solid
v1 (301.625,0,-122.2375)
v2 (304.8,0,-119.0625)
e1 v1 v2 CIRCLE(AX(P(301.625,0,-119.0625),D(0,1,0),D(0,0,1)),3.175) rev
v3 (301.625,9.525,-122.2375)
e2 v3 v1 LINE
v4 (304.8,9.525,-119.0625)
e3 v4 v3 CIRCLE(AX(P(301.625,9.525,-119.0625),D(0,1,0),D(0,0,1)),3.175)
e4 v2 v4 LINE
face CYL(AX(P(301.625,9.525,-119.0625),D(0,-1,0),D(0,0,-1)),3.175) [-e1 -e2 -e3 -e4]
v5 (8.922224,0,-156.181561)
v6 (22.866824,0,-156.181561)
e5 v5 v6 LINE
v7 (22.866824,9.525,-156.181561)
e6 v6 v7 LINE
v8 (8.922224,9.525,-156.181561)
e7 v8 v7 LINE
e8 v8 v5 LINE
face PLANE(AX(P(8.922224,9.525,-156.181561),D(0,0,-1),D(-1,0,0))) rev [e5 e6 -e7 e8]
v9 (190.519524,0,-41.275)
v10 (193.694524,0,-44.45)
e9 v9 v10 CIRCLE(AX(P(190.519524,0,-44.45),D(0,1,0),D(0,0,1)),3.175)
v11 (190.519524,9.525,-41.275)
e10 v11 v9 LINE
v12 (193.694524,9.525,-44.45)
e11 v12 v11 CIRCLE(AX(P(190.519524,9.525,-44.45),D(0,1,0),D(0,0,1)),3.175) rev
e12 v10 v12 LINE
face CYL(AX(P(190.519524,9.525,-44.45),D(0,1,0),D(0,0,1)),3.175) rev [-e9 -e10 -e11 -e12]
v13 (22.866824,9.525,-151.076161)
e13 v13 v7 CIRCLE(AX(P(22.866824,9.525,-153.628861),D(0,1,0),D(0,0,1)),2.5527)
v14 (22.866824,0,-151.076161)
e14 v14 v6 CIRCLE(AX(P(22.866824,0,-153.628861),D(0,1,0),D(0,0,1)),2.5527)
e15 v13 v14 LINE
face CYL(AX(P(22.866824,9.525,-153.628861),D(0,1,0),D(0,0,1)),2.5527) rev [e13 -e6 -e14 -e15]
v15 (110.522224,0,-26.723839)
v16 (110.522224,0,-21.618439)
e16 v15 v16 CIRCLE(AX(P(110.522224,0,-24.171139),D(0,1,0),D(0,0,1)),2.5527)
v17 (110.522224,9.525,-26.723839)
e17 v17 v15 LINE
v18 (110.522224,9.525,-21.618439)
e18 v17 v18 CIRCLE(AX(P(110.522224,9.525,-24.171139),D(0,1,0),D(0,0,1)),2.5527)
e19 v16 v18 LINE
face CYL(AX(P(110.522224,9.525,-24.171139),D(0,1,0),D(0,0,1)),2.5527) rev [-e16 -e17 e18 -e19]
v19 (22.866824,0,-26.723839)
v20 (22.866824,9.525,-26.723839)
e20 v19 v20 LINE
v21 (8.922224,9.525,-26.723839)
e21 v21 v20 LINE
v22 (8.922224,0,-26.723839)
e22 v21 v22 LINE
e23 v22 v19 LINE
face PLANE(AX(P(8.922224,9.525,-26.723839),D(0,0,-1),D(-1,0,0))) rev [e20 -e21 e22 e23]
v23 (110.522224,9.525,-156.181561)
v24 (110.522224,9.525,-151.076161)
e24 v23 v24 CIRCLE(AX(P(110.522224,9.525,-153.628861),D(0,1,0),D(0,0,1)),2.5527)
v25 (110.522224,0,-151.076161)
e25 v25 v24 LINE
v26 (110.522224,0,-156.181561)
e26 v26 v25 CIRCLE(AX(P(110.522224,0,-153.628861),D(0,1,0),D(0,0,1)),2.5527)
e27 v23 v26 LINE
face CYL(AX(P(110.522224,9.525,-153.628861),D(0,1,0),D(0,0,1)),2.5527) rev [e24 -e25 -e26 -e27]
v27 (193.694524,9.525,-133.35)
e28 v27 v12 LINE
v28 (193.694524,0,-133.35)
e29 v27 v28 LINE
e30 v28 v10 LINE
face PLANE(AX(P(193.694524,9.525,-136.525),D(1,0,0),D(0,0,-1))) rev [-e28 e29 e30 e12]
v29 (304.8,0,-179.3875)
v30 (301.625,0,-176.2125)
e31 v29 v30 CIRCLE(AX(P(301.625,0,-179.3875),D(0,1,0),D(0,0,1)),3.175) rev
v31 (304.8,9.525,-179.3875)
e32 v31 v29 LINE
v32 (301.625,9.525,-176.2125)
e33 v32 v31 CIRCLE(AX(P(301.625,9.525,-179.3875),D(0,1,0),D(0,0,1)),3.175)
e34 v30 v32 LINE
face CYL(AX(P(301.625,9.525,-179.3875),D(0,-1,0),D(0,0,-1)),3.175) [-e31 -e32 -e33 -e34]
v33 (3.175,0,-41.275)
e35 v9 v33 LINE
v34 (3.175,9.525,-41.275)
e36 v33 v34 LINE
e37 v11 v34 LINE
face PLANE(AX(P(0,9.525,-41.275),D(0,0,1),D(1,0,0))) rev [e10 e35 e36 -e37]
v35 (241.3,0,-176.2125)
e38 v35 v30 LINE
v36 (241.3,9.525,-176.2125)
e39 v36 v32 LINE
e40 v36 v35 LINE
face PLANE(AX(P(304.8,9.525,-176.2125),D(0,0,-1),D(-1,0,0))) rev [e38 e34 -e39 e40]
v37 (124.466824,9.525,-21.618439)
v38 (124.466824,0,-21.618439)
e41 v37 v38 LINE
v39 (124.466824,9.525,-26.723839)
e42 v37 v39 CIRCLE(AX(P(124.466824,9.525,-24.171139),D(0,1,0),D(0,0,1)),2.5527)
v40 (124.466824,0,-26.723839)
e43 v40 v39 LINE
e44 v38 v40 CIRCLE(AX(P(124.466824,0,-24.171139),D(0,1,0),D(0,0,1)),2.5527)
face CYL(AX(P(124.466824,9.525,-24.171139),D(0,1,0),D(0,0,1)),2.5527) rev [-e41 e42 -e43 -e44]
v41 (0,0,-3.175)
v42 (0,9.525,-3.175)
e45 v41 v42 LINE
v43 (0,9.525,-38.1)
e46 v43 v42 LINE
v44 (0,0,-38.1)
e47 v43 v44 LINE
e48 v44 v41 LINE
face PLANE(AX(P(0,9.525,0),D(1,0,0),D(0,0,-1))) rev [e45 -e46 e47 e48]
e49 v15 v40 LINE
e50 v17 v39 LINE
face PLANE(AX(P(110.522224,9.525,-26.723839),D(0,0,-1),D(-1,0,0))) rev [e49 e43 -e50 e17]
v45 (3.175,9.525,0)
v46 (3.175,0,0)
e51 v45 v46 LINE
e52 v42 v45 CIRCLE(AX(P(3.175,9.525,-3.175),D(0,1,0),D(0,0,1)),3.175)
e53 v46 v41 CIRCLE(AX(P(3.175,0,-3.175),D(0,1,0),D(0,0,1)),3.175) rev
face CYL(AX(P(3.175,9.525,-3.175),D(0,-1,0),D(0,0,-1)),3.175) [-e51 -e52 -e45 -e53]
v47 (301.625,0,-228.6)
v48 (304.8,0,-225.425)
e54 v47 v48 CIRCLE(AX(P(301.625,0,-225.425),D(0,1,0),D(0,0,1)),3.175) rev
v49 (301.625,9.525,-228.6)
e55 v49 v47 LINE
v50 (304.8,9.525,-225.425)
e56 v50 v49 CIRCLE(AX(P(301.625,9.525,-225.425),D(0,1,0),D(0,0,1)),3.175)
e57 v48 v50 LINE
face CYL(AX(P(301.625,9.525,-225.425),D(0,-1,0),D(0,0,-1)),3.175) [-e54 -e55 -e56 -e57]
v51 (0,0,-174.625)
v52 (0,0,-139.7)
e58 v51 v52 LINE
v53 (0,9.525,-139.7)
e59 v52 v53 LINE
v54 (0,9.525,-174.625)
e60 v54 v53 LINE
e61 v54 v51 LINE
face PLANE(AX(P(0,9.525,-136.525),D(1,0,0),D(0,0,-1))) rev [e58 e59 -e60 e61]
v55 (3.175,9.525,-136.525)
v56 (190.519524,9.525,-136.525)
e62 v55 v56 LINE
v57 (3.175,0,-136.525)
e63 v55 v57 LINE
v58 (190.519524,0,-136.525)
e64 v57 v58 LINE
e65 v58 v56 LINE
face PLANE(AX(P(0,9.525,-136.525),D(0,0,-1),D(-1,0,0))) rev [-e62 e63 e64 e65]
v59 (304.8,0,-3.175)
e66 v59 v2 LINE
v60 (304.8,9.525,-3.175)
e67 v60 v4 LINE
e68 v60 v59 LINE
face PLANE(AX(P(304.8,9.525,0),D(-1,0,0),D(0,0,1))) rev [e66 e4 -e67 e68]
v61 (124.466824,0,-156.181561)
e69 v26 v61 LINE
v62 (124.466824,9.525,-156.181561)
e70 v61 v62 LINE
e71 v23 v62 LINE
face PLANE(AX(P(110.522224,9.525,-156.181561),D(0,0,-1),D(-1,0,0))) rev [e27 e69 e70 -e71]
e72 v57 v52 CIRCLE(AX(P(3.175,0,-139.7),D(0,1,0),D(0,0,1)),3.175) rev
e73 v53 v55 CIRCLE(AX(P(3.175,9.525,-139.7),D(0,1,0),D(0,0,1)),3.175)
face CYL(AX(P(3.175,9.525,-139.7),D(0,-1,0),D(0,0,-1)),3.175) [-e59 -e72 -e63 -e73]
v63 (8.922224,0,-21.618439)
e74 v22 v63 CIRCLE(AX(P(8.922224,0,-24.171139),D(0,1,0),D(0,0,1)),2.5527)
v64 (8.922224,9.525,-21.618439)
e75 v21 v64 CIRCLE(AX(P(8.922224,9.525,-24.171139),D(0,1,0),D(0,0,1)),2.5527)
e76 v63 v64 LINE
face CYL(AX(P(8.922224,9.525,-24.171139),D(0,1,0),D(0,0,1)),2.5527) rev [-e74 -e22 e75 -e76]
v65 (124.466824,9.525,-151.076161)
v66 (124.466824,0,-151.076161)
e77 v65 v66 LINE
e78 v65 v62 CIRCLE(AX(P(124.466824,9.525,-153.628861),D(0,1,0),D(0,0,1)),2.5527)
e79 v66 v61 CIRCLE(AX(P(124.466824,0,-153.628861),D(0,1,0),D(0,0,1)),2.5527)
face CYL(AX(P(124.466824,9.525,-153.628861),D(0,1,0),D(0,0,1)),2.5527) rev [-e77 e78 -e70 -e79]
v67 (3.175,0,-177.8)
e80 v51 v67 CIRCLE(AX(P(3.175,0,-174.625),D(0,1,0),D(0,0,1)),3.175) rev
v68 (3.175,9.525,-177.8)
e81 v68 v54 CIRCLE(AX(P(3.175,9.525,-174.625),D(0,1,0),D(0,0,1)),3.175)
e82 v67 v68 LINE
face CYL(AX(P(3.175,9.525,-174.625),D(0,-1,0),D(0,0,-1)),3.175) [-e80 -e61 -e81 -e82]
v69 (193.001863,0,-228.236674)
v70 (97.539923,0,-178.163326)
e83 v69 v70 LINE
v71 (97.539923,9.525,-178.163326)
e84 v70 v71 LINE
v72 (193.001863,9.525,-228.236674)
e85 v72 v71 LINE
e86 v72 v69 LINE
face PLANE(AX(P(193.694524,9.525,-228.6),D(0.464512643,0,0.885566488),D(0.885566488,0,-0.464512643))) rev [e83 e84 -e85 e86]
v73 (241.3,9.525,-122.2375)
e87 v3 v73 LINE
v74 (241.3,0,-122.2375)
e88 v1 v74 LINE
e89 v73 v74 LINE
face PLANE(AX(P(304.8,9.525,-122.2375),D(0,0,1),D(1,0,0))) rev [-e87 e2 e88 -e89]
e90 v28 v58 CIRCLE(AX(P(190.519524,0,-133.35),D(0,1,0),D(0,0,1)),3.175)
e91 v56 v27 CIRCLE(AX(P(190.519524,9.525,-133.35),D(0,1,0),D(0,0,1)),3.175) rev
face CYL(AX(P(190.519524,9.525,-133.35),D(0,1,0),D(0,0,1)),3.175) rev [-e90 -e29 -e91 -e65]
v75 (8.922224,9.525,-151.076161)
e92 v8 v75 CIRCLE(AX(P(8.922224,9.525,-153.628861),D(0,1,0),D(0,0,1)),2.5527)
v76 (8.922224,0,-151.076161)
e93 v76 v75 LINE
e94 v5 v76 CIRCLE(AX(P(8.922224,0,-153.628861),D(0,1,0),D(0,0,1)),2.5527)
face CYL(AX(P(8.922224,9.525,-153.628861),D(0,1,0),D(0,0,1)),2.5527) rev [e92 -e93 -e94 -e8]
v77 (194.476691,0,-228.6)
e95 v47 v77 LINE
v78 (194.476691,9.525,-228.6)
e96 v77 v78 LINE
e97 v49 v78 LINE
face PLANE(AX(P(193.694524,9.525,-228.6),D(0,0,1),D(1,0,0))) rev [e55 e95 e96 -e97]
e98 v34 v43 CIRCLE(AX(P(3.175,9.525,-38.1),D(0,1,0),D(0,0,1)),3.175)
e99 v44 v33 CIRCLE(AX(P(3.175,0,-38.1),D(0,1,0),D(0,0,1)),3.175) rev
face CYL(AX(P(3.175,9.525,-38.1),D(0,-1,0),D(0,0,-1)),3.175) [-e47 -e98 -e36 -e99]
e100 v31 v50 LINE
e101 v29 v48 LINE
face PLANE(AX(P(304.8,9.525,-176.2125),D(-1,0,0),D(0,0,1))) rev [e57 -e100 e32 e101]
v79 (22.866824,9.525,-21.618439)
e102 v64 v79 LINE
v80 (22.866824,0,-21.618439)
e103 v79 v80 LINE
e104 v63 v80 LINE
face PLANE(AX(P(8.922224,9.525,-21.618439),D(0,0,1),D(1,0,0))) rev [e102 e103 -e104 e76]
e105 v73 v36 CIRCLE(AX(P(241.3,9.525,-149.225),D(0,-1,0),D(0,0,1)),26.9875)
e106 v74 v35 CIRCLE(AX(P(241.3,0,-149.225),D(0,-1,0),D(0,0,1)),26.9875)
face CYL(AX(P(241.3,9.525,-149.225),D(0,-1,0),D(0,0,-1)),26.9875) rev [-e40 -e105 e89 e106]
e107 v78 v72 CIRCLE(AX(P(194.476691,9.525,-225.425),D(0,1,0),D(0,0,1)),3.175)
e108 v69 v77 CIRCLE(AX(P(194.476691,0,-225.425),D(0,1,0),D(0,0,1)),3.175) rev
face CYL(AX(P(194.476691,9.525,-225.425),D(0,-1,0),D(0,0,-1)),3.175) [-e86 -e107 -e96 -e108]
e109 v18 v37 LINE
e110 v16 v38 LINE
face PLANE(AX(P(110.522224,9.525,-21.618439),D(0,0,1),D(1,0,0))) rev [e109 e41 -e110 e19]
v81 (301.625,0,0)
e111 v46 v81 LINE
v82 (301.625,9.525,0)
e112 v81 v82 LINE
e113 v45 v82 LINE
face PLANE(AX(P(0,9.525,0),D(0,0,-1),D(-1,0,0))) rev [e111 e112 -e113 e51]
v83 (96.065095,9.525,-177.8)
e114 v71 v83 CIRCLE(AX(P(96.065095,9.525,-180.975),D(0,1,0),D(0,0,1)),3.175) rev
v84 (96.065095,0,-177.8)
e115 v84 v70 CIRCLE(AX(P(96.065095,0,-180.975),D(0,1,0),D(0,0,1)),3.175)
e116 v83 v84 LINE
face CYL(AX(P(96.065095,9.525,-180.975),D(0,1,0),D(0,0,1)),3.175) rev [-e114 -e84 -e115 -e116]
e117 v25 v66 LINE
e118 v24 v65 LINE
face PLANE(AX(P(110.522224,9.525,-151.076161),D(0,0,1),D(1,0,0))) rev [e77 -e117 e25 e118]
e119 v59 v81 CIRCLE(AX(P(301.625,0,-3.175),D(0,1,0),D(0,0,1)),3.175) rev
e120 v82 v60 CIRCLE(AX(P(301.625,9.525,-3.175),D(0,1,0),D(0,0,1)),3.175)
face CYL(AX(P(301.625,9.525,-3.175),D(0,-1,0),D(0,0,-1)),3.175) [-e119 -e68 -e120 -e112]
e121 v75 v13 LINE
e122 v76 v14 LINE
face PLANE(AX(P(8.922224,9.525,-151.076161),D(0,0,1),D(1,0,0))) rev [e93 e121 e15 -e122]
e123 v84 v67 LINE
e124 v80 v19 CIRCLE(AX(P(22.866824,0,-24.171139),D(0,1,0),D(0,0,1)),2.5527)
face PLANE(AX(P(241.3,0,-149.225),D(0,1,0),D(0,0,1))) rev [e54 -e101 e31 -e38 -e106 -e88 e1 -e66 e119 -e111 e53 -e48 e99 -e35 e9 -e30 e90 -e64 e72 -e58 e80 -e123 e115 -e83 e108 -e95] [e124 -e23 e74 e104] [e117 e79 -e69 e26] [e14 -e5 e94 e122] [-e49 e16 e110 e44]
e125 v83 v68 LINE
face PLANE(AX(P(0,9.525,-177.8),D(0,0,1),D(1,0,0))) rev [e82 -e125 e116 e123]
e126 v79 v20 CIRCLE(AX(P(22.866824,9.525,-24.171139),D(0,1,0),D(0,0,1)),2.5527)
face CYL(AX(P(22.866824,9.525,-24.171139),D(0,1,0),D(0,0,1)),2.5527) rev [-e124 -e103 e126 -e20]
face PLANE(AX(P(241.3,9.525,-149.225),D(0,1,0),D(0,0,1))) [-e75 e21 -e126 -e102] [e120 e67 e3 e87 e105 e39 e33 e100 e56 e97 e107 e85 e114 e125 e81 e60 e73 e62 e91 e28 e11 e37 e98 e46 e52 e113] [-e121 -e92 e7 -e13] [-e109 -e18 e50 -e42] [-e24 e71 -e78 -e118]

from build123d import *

# Parameters (mm, degrees)
BOSS_EXTRUDE1_DEPTH            = 9.525
F_7_0_201_DIAMETER_SLOT1_DEPTH = 9.525
FILLET1_R                      = 3.175


# Read off the part's stored shape, not the designer's step: #7 (0.201) Diameter Slot1
with BuildPart() as part:
    # Sketch1 → Boss-Extrude1 (new body)
    with BuildSketch(Plane(origin=(0, 0, 0), x_dir=(1, 0, 0), z_dir=(0, 1, 0))):
        with BuildLine():
            Line((0, 0), (304.8, 0))
            Line((304.8, 0), (304.8, 122.2375))
            Line((304.8, 122.2375), (241.3, 122.2375))
            ThreePointArc((241.3, 122.2375), (214.3125, 149.225), (241.3, 176.2125))
            Line((241.3, 176.2125), (304.8, 176.2125))
            Line((304.8, 176.2125), (304.8, 228.6))
            Line((304.8, 228.6), (193.694523922, 228.6))
            Line((193.694523922, 228.6), (96.847261961, 177.8))
            Line((96.847261961, 177.8), (0, 177.8))
            Line((0, 177.8), (0, 136.525))
            Line((0, 136.525), (193.694523922, 136.525))
            Line((193.694523922, 136.525), (193.694523922, 41.275))
            Line((193.694523922, 41.275), (0, 41.275))
            Line((0, 41.275), (0, 0))
        make_face()
    extrude(amount=BOSS_EXTRUDE1_DEPTH)

    # #7 (0.201) Diameter Slot1 outline → #7 (0.201) Diameter Slot1 (cut)
    with BuildSketch(Plane(origin=(0, 0, 0), x_dir=(1, 0, 0), z_dir=(0, 1, 0))):
        with BuildLine():
            Line((8.922223922, 151.076161), (22.866823922, 151.076161))
            ThreePointArc((22.866823922, 151.076161), (25.419523922, 153.628861), (22.866823922, 156.181561))
            Line((22.866823922, 156.181561), (8.922223922, 156.181561))
            ThreePointArc((8.922223922, 156.181561), (6.369523922, 153.628861), (8.922223922, 151.076161))
        make_face()
        with BuildLine():
            ThreePointArc((124.466823922, 151.076161), (127.019523922, 153.628861), (124.466823922, 156.181561))
            Line((124.466823922, 156.181561), (110.522223922, 156.181561))
            ThreePointArc((110.522223922, 156.181561), (107.969523922, 153.628861), (110.522223922, 151.076161))
            Line((110.522223922, 151.076161), (124.466823922, 151.076161))
        make_face()
        with BuildLine():
            Line((8.922223922, 21.618439), (22.866823922, 21.618439))
            ThreePointArc((22.866823922, 21.618439), (25.419523922, 24.171139), (22.866823922, 26.723839))
            Line((22.866823922, 26.723839), (8.922223922, 26.723839))
            ThreePointArc((8.922223922, 26.723839), (6.369523922, 24.171139), (8.922223922, 21.618439))
        make_face()
        with BuildLine():
            ThreePointArc((124.466823922, 21.618439), (127.019523922, 24.171139), (124.466823922, 26.723839))
            Line((124.466823922, 26.723839), (110.522223922, 26.723839))
            ThreePointArc((110.522223922, 26.723839), (107.969523922, 24.171139), (110.522223922, 21.618439))
            Line((110.522223922, 21.618439), (124.466823922, 21.618439))
        make_face()
    extrude(amount=F_7_0_201_DIAMETER_SLOT1_DEPTH, mode=Mode.SUBTRACT)

    # Fillet1
    fillet1_edges = [part.edges().sort_by_distance(p)[0] for p in [
        (0, 4.7625, -41.275),
        (193.694523922, 4.7625, -41.275),
        (193.694523922, 4.7625, -136.525),
        (0, 4.7625, -136.525),
        (0, 4.7625, -177.8),
        (96.847261961, 4.7625, -177.8),
        (193.694523922, 4.7625, -228.6),
        (304.8, 4.7625, -228.6),
        (304.8, 4.7625, -176.2125),
        (304.8, 4.7625, -122.2375),
        (304.8, 4.7625, 0),
        (0, 4.7625, 0),
    ]]
    fillet(fillet1_edges, radius=FILLET1_R)


solid = part.part
